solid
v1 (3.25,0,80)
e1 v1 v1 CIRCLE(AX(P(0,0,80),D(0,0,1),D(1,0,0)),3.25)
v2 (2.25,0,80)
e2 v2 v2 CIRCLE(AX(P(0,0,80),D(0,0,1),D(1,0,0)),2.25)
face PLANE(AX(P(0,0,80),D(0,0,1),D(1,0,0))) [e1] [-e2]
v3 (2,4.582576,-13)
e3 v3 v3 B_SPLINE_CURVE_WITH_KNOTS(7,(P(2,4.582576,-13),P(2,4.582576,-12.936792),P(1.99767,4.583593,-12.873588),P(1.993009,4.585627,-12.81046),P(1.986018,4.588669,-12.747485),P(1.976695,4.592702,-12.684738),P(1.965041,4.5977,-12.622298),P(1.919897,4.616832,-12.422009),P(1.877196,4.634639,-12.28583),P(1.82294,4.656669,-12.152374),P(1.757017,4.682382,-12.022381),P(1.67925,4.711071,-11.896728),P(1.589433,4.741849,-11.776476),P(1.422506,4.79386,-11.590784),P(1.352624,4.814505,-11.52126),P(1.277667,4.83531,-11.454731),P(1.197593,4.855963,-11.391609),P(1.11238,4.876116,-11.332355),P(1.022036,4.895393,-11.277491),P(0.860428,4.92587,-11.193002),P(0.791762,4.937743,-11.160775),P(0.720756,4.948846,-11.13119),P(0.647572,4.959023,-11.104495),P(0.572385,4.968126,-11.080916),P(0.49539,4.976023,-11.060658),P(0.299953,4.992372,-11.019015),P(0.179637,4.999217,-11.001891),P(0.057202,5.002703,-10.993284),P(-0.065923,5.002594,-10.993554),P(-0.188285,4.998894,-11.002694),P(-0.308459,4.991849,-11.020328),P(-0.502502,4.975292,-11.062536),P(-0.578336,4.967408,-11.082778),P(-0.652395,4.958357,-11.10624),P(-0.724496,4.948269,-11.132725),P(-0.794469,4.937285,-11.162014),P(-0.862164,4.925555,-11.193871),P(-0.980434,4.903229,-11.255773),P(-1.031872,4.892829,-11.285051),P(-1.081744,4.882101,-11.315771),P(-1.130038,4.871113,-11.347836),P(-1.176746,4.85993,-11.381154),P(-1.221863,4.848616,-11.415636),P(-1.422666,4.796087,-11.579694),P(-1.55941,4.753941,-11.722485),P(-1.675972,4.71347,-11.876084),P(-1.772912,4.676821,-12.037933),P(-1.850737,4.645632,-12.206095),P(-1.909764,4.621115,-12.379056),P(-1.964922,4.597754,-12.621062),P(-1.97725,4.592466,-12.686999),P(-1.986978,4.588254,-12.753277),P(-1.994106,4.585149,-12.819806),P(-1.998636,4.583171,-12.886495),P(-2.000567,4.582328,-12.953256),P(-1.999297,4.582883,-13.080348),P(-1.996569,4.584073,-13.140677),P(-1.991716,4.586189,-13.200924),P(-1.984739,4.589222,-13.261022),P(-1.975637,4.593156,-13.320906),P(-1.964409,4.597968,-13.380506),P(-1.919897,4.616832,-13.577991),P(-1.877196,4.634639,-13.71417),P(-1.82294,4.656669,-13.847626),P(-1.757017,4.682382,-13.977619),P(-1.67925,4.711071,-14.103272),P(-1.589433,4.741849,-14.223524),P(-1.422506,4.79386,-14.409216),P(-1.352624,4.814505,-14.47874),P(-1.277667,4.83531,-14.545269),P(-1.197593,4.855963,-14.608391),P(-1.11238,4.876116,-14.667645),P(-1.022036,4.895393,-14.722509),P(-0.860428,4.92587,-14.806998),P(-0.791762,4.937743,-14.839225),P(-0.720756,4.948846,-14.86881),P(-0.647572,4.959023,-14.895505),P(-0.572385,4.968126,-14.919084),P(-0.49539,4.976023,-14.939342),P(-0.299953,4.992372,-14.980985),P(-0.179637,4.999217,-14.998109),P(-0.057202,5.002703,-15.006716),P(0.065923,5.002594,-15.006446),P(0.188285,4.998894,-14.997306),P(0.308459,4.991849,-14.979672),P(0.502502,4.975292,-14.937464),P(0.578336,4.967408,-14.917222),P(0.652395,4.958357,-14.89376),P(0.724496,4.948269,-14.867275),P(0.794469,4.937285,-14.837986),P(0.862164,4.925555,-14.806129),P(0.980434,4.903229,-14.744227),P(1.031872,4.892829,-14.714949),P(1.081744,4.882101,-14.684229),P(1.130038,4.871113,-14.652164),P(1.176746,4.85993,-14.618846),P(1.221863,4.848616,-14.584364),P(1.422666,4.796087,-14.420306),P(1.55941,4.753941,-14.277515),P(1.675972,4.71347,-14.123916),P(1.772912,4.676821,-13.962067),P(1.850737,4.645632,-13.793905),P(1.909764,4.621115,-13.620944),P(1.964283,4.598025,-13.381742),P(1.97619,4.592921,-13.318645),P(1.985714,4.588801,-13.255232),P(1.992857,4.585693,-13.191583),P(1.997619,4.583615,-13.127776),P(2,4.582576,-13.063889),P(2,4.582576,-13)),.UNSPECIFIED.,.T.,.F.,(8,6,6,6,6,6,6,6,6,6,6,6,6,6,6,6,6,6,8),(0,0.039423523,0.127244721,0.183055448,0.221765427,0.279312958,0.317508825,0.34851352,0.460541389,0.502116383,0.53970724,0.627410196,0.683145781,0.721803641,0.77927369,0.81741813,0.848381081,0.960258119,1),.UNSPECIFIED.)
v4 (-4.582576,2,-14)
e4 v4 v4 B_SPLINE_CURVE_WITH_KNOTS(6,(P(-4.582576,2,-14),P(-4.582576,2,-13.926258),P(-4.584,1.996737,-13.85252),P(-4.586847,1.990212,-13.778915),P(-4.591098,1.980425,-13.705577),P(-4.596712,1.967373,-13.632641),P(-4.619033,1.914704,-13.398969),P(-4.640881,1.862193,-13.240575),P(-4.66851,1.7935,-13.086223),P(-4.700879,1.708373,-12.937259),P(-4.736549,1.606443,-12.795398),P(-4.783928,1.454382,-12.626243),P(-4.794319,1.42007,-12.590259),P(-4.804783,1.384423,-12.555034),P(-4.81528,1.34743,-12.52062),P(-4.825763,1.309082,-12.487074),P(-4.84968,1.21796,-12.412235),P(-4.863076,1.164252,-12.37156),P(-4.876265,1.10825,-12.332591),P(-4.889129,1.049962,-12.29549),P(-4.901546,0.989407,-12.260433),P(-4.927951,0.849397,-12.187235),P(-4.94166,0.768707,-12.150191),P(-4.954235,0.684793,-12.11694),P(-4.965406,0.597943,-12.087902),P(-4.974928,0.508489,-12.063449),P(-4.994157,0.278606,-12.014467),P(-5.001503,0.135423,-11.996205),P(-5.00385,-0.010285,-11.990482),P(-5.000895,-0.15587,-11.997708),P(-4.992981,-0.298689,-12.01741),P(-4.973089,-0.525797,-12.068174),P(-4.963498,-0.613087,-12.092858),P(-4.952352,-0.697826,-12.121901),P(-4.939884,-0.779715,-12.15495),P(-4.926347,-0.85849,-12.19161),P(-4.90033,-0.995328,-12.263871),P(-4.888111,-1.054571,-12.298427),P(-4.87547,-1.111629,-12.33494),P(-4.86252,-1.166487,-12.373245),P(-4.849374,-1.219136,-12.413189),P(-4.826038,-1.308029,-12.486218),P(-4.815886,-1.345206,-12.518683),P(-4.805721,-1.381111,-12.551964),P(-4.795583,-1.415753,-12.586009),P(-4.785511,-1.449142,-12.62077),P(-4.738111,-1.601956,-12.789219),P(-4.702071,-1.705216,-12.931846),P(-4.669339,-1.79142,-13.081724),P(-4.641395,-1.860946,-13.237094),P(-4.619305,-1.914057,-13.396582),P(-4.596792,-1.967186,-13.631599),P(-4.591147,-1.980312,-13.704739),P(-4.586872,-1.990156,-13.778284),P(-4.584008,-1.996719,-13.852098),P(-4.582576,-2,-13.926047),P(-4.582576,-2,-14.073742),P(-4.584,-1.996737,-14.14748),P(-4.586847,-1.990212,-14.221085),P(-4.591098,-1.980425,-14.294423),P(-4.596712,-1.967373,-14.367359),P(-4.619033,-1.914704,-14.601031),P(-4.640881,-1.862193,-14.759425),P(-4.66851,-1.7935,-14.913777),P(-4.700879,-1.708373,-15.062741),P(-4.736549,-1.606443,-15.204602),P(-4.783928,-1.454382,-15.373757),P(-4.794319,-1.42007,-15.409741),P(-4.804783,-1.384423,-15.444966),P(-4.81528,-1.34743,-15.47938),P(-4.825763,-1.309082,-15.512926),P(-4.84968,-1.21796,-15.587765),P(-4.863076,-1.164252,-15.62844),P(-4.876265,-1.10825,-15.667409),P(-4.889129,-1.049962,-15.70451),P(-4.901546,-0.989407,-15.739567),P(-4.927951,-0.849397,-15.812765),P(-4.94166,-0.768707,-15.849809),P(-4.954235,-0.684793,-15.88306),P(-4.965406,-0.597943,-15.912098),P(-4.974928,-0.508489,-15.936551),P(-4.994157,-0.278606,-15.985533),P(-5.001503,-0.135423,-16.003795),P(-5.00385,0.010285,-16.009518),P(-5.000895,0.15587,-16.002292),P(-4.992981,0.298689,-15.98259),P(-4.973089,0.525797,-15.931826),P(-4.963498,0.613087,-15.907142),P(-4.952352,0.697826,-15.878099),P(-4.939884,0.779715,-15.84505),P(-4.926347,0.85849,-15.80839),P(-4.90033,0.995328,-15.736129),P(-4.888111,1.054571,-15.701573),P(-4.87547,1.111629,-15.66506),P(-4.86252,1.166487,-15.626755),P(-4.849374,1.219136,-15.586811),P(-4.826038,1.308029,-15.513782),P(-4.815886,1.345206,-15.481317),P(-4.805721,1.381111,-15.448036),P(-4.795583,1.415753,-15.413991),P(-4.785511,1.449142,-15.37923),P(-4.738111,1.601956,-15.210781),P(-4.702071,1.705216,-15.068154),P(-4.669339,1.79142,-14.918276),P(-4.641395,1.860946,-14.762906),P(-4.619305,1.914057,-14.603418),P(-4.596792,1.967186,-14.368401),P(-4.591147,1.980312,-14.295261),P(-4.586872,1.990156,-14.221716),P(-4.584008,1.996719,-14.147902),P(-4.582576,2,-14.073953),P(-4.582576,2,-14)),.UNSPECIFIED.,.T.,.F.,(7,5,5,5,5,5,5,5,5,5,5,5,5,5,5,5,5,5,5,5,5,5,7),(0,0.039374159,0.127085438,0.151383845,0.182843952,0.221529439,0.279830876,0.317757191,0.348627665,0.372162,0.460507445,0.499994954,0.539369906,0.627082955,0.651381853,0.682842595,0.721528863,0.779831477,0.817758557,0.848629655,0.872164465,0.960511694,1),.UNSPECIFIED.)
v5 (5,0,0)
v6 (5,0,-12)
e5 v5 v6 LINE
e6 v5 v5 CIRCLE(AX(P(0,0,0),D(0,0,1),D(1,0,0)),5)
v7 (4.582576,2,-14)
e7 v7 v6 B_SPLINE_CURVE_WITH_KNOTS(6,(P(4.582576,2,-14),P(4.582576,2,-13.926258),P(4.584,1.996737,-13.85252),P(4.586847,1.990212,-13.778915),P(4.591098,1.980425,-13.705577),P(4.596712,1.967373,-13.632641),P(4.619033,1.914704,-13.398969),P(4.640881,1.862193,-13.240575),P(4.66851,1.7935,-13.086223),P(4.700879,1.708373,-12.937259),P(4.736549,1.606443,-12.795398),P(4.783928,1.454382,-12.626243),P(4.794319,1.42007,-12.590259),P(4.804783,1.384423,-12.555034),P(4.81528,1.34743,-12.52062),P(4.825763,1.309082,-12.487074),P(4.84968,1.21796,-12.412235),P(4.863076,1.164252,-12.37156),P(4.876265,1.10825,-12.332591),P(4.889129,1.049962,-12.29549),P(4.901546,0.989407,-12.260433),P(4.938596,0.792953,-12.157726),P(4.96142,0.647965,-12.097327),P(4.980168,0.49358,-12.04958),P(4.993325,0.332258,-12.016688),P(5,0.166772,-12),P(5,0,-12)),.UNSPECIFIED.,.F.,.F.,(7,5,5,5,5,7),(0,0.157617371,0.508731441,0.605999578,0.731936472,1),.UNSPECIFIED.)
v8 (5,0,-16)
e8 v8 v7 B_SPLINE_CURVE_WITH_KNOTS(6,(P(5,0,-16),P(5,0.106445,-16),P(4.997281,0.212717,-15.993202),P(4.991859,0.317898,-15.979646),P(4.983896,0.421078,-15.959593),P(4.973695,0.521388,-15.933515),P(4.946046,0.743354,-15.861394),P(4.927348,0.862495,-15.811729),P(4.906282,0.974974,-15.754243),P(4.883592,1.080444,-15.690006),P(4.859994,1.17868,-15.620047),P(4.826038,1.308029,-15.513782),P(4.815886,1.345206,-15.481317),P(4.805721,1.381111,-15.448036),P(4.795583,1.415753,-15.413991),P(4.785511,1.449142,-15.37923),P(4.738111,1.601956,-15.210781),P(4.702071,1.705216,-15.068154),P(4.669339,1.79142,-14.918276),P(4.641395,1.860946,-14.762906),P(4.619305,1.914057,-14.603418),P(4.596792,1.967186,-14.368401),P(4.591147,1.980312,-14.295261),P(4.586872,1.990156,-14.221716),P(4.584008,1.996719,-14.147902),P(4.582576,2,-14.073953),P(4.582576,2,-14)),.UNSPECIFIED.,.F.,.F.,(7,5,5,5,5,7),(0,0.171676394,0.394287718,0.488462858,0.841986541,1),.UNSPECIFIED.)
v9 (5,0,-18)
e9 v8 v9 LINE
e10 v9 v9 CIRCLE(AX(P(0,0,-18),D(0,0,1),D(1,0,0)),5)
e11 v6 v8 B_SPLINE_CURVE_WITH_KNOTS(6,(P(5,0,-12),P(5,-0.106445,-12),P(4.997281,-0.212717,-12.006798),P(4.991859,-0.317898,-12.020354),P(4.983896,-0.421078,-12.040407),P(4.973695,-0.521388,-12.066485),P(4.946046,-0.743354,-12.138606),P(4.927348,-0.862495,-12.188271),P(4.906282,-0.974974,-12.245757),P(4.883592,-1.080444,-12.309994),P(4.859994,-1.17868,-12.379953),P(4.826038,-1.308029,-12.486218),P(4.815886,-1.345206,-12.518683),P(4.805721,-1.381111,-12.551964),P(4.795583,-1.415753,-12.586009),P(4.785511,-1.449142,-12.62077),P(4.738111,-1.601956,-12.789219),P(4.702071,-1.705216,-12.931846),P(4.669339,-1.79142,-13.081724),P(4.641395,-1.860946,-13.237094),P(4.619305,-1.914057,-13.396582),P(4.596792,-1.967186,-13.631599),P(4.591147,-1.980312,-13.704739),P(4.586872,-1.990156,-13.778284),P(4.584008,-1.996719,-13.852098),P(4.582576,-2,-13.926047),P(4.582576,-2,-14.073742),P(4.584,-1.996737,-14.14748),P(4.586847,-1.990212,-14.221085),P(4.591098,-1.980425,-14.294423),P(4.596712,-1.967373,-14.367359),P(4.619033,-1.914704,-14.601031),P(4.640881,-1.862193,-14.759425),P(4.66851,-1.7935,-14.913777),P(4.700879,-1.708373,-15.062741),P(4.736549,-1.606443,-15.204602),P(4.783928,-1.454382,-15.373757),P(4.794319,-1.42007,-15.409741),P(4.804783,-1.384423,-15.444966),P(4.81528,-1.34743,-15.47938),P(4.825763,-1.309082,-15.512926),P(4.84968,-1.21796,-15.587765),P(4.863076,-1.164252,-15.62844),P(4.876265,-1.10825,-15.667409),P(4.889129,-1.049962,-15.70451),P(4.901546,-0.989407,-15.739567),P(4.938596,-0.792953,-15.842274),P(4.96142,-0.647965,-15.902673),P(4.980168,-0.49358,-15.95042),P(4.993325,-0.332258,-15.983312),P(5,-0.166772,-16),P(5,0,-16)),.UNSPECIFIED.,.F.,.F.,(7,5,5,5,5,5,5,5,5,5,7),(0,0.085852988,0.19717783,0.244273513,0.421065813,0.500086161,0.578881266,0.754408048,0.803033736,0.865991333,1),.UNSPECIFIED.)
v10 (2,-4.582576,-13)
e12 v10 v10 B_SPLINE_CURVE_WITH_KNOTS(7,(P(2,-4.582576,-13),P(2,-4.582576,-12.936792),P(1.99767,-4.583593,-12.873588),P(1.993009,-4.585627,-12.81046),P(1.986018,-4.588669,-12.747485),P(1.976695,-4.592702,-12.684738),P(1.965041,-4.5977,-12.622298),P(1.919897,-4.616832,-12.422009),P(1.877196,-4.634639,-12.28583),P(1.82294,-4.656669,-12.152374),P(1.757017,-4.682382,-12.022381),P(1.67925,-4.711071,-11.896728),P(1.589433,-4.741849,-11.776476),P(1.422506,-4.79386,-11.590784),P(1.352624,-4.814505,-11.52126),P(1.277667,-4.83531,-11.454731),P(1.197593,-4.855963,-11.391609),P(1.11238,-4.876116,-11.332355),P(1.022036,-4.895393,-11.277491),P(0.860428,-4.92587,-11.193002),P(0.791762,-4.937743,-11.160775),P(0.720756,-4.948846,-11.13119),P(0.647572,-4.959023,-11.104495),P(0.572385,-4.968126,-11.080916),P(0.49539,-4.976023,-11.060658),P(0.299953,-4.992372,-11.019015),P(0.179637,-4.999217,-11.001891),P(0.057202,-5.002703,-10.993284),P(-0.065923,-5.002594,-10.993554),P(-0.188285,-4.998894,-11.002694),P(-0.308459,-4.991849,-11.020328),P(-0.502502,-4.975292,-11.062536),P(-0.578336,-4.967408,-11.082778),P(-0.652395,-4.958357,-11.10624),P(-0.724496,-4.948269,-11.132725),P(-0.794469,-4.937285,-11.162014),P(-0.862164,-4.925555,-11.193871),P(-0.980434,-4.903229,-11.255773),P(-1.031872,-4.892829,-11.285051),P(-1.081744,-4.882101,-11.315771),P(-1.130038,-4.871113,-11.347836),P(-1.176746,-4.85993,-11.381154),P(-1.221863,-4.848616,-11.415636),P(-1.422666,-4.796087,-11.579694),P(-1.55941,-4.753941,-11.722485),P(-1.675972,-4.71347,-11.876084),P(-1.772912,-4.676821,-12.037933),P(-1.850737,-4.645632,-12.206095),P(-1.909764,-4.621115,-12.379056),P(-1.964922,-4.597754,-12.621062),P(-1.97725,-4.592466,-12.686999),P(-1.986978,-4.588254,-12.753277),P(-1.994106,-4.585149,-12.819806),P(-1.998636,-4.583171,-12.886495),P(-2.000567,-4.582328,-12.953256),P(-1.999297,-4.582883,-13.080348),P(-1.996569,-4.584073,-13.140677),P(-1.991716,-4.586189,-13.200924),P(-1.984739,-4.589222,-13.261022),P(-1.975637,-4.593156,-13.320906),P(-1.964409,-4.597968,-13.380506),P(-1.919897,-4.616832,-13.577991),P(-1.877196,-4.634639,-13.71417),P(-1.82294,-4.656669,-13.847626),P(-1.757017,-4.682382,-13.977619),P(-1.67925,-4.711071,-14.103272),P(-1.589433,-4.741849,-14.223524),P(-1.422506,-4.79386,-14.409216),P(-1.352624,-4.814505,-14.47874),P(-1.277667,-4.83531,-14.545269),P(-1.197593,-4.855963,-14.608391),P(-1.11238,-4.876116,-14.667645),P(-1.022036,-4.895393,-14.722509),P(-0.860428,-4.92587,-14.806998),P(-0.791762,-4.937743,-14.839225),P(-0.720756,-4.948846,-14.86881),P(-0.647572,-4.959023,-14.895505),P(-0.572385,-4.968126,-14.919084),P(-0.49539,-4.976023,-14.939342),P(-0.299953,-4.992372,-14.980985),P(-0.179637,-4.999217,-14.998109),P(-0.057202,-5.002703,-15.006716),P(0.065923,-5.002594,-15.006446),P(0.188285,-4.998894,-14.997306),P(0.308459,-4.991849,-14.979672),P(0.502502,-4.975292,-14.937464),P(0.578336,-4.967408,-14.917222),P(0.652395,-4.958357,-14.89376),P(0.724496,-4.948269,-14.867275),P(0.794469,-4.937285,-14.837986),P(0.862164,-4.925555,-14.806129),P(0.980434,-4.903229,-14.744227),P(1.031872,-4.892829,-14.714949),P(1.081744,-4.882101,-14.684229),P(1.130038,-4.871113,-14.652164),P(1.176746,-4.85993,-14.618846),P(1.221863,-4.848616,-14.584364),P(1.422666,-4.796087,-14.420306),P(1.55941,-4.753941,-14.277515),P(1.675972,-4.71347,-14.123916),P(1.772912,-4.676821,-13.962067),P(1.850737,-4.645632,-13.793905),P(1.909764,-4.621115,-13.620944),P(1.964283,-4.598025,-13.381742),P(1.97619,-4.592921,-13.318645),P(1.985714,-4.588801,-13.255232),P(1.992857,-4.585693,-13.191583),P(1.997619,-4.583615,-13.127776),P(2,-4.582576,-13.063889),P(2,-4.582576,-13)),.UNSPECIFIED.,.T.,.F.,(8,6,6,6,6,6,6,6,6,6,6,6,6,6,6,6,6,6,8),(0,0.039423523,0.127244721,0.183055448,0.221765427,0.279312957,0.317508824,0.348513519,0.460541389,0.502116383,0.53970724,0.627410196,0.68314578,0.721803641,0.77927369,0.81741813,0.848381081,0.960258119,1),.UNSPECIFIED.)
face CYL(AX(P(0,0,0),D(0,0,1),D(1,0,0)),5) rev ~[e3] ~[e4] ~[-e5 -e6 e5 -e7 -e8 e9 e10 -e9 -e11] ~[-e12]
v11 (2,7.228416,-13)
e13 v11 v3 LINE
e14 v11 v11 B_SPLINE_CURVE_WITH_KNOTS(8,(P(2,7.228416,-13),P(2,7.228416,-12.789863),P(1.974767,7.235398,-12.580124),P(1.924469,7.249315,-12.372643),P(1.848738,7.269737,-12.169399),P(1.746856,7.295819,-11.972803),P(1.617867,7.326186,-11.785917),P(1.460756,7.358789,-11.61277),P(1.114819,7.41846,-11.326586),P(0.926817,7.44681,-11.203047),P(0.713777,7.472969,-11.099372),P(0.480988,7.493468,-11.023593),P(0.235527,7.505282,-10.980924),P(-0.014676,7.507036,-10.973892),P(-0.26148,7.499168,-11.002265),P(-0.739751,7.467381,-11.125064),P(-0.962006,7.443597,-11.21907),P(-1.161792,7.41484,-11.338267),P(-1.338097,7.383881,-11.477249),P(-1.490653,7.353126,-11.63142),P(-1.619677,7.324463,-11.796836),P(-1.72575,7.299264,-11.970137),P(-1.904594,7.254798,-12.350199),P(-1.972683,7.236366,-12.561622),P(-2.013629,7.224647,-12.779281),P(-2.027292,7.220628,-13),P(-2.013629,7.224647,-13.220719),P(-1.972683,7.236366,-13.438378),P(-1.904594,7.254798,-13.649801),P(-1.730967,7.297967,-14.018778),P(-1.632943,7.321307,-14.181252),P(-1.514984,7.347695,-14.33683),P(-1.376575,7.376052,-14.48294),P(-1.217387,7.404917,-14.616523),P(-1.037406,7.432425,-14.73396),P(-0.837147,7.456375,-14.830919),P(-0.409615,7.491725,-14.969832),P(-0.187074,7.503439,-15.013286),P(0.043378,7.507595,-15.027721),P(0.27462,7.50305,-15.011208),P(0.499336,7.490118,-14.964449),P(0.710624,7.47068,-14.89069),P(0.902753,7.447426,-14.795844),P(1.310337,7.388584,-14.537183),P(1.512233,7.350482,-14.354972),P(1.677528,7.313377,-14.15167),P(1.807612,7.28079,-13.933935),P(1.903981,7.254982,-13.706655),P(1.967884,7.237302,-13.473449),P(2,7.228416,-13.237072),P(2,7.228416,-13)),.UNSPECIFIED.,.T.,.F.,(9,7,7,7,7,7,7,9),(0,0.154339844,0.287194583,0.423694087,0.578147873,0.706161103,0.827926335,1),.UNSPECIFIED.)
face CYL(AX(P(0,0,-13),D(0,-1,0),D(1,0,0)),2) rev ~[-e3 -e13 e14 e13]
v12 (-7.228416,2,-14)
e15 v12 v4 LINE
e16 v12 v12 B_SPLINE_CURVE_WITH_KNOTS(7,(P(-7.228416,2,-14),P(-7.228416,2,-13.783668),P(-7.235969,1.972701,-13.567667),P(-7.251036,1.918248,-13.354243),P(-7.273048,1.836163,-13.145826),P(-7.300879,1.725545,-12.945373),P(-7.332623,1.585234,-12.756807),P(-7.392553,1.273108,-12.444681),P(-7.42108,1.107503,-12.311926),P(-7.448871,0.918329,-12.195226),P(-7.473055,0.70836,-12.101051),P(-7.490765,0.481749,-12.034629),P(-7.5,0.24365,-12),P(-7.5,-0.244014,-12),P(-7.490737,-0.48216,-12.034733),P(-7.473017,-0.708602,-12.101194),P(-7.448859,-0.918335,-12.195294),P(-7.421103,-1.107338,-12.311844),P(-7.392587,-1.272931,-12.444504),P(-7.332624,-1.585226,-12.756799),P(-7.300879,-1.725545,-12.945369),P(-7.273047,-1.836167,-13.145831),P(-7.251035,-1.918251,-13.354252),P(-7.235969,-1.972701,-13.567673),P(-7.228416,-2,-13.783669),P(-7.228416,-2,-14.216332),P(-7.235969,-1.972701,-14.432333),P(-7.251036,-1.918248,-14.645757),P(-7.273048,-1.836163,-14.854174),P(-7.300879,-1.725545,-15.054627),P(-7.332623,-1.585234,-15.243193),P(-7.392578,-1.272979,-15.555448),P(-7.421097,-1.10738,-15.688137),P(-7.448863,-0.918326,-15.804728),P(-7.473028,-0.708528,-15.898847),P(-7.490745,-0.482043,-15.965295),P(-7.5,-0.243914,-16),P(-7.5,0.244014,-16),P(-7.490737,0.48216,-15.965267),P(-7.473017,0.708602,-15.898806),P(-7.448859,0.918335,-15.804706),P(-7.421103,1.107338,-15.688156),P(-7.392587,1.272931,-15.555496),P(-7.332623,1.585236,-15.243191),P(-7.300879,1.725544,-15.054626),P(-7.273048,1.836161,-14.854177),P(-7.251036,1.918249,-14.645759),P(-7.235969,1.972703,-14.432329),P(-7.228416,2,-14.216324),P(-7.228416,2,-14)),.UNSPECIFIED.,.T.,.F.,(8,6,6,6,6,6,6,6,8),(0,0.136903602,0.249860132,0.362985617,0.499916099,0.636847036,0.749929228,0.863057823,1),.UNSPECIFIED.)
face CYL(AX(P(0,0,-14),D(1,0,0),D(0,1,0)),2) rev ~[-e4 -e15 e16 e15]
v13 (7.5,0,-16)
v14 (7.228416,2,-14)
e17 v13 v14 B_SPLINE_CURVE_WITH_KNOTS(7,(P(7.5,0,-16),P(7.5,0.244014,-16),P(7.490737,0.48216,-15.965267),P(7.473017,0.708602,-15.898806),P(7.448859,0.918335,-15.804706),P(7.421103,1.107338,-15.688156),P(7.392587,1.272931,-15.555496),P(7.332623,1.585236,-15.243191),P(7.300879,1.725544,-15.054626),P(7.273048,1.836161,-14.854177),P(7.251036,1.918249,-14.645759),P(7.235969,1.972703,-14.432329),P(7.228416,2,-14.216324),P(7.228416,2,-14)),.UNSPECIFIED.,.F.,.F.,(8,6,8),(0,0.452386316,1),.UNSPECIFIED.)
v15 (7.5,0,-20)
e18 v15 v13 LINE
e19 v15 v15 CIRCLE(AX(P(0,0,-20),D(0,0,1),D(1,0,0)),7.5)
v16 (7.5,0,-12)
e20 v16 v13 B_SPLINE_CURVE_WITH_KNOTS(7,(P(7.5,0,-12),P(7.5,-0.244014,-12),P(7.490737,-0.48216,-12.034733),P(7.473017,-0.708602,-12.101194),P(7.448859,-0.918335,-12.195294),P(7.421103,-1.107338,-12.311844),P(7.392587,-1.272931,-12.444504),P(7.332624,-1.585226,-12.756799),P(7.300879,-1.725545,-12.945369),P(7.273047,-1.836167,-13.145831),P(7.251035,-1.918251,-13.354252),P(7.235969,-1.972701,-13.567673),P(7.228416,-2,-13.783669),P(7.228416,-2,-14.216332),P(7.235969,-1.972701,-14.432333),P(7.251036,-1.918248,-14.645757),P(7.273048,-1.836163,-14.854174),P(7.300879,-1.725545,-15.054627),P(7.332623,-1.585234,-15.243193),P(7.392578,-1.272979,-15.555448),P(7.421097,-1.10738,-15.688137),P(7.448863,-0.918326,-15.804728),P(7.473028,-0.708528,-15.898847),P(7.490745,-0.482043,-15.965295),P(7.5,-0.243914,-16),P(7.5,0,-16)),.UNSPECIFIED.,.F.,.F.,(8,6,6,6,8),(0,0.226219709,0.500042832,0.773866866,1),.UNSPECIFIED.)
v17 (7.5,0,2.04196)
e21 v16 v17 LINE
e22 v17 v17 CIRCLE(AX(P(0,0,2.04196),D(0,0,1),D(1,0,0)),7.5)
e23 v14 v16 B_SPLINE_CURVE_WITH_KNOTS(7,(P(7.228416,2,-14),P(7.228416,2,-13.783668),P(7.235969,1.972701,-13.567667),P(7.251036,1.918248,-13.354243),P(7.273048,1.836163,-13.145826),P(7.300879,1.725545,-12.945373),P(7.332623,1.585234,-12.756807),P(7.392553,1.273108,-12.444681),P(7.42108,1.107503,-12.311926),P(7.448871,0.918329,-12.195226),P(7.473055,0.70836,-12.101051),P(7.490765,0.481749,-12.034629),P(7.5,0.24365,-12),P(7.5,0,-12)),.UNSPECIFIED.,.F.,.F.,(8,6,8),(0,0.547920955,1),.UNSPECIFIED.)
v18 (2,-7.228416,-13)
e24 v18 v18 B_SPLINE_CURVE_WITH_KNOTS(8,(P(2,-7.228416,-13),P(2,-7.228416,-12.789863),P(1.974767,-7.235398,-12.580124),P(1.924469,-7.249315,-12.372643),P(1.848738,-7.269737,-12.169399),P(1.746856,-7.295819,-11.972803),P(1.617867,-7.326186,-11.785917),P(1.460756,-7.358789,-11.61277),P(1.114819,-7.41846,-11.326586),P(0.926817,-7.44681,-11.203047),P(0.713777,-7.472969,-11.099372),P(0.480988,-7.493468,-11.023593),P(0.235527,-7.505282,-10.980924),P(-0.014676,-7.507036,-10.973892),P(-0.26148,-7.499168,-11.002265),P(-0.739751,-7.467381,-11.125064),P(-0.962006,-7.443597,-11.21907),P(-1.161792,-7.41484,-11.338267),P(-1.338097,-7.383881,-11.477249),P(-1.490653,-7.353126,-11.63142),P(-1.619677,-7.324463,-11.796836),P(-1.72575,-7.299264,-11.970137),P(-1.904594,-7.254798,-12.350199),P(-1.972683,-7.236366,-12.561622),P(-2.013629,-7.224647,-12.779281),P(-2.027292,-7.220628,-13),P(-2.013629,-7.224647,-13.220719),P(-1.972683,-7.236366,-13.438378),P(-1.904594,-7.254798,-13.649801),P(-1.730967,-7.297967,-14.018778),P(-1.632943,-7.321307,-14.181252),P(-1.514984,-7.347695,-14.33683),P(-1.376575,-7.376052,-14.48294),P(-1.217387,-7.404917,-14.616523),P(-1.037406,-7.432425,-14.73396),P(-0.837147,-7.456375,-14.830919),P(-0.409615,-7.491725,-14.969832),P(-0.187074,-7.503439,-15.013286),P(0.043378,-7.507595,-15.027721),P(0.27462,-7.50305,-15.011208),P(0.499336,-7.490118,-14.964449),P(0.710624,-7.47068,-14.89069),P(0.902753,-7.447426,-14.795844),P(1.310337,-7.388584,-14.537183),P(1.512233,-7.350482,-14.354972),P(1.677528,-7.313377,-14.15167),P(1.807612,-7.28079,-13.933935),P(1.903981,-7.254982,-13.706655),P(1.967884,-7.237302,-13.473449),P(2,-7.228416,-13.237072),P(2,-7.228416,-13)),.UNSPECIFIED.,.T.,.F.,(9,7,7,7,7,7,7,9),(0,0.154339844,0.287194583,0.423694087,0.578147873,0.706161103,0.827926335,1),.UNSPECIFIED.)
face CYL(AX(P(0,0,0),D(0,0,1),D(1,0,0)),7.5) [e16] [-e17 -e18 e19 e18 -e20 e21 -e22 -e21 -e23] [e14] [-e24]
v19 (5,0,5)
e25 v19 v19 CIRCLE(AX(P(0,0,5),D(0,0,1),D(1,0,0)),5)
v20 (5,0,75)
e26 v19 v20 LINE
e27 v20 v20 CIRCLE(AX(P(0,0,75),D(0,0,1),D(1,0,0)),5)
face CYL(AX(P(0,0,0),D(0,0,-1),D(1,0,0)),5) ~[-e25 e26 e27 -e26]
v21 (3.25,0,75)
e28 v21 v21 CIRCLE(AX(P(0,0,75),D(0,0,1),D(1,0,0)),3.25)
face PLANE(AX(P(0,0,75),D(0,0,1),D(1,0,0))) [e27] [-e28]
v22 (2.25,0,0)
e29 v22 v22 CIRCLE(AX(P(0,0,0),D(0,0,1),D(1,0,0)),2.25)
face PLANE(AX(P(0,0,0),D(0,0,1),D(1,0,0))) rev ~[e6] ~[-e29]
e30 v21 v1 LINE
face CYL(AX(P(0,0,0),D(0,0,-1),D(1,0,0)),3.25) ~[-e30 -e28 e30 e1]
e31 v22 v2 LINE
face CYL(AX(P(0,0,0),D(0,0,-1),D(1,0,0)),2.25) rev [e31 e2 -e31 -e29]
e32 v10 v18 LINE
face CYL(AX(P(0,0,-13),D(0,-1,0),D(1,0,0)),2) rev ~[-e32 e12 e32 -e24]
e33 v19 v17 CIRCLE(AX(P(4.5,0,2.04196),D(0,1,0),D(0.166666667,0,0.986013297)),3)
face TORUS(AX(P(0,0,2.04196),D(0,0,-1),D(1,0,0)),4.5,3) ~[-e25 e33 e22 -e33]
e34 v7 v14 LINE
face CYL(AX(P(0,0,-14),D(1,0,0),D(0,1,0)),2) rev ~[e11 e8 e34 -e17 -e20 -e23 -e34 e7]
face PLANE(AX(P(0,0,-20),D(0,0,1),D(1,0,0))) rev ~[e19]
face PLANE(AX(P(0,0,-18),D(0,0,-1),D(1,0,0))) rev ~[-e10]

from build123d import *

# Parameters (mm, degrees)
F0_R      = 3.25
F0_R_2    = 2.25
F1_DEPTH  = 80
F0_R_3    = 5
F2_DEPTH  = 75
F0_R_4    = 7.5
F3_DEPTH  = 5
F4_DEPTH  = 20
F6_R      = 5.5
F7_DEPTH  = 2
F8_R      = 2
F9_DEPTH  = 12.5
F10_R     = 2
F11_DEPTH = 12.5


# Not quite as in the source:
# - a fillet or chamfer that OpenCascade refuses, or shapes differently, is made with other operations: its cross-section is extruded or revolved along the edge and cut away or added


with BuildPart() as f1:
    # F0 (on Top) → F1 (new body)
    with BuildSketch(Plane.XY):
        Circle(F0_R)
        Circle(F0_R_2, mode=Mode.SUBTRACT)
    extrude(amount=F1_DEPTH)

    # F0 (on Top) → F2 (join)
    with BuildSketch(Plane.XY):
        Circle(F0_R_3)
        Circle(F0_R, mode=Mode.SUBTRACT)
    extrude(amount=F2_DEPTH)

    # F0 (on Top) → F3 (join)
    with BuildSketch(Plane.XY):
        Circle(F0_R_4)
        Circle(F0_R_3, mode=Mode.SUBTRACT)
    extrude(amount=F3_DEPTH)

    # F0 (on Top) → F4 (join)
    with BuildSketch(Plane.XY):
        Circle(F0_R_4)
        Circle(F0_R_3, mode=Mode.SUBTRACT)
    extrude(amount=-F4_DEPTH)

    # F6 (on offset) → F7 (join)
    with BuildSketch(Plane(origin=(0, 0, -20), x_dir=(1, 0, 0), z_dir=(0, 0, -1))):
        Circle(F6_R)
    extrude(amount=-F7_DEPTH)

    # F8 (on Front) → F9 (cut, symmetric)
    with BuildSketch(Plane.XZ):
        with Locations((0, -13)):
            Circle(F8_R)
    extrude(amount=F9_DEPTH, both=True, mode=Mode.SUBTRACT)

    # F10 (on Right) → F11 (cut, symmetric)
    with BuildSketch(Plane.YZ):
        with Locations((0, -14)):
            Circle(F10_R)
    extrude(amount=F11_DEPTH, both=True, mode=Mode.SUBTRACT)

    # F12: fillet of radius 3 on 1 edges, made by hand

    # F12_s1 → F12_t2 (revolve, cut)
    with BuildSketch(Plane.XZ):
        with BuildLine():
            ThreePointArc((5, 5), (6.7912878475, 3.9784517816), (7.5, 2.0419601084))
            Line((7.5, 2.0419601084), (7.5, 5))
            Line((7.5, 5), (5, 5))
        make_face()
    revolve(axis=Axis((0, 0, 5), (0, 0, 1)), mode=Mode.SUBTRACT)


solid = f1.part
